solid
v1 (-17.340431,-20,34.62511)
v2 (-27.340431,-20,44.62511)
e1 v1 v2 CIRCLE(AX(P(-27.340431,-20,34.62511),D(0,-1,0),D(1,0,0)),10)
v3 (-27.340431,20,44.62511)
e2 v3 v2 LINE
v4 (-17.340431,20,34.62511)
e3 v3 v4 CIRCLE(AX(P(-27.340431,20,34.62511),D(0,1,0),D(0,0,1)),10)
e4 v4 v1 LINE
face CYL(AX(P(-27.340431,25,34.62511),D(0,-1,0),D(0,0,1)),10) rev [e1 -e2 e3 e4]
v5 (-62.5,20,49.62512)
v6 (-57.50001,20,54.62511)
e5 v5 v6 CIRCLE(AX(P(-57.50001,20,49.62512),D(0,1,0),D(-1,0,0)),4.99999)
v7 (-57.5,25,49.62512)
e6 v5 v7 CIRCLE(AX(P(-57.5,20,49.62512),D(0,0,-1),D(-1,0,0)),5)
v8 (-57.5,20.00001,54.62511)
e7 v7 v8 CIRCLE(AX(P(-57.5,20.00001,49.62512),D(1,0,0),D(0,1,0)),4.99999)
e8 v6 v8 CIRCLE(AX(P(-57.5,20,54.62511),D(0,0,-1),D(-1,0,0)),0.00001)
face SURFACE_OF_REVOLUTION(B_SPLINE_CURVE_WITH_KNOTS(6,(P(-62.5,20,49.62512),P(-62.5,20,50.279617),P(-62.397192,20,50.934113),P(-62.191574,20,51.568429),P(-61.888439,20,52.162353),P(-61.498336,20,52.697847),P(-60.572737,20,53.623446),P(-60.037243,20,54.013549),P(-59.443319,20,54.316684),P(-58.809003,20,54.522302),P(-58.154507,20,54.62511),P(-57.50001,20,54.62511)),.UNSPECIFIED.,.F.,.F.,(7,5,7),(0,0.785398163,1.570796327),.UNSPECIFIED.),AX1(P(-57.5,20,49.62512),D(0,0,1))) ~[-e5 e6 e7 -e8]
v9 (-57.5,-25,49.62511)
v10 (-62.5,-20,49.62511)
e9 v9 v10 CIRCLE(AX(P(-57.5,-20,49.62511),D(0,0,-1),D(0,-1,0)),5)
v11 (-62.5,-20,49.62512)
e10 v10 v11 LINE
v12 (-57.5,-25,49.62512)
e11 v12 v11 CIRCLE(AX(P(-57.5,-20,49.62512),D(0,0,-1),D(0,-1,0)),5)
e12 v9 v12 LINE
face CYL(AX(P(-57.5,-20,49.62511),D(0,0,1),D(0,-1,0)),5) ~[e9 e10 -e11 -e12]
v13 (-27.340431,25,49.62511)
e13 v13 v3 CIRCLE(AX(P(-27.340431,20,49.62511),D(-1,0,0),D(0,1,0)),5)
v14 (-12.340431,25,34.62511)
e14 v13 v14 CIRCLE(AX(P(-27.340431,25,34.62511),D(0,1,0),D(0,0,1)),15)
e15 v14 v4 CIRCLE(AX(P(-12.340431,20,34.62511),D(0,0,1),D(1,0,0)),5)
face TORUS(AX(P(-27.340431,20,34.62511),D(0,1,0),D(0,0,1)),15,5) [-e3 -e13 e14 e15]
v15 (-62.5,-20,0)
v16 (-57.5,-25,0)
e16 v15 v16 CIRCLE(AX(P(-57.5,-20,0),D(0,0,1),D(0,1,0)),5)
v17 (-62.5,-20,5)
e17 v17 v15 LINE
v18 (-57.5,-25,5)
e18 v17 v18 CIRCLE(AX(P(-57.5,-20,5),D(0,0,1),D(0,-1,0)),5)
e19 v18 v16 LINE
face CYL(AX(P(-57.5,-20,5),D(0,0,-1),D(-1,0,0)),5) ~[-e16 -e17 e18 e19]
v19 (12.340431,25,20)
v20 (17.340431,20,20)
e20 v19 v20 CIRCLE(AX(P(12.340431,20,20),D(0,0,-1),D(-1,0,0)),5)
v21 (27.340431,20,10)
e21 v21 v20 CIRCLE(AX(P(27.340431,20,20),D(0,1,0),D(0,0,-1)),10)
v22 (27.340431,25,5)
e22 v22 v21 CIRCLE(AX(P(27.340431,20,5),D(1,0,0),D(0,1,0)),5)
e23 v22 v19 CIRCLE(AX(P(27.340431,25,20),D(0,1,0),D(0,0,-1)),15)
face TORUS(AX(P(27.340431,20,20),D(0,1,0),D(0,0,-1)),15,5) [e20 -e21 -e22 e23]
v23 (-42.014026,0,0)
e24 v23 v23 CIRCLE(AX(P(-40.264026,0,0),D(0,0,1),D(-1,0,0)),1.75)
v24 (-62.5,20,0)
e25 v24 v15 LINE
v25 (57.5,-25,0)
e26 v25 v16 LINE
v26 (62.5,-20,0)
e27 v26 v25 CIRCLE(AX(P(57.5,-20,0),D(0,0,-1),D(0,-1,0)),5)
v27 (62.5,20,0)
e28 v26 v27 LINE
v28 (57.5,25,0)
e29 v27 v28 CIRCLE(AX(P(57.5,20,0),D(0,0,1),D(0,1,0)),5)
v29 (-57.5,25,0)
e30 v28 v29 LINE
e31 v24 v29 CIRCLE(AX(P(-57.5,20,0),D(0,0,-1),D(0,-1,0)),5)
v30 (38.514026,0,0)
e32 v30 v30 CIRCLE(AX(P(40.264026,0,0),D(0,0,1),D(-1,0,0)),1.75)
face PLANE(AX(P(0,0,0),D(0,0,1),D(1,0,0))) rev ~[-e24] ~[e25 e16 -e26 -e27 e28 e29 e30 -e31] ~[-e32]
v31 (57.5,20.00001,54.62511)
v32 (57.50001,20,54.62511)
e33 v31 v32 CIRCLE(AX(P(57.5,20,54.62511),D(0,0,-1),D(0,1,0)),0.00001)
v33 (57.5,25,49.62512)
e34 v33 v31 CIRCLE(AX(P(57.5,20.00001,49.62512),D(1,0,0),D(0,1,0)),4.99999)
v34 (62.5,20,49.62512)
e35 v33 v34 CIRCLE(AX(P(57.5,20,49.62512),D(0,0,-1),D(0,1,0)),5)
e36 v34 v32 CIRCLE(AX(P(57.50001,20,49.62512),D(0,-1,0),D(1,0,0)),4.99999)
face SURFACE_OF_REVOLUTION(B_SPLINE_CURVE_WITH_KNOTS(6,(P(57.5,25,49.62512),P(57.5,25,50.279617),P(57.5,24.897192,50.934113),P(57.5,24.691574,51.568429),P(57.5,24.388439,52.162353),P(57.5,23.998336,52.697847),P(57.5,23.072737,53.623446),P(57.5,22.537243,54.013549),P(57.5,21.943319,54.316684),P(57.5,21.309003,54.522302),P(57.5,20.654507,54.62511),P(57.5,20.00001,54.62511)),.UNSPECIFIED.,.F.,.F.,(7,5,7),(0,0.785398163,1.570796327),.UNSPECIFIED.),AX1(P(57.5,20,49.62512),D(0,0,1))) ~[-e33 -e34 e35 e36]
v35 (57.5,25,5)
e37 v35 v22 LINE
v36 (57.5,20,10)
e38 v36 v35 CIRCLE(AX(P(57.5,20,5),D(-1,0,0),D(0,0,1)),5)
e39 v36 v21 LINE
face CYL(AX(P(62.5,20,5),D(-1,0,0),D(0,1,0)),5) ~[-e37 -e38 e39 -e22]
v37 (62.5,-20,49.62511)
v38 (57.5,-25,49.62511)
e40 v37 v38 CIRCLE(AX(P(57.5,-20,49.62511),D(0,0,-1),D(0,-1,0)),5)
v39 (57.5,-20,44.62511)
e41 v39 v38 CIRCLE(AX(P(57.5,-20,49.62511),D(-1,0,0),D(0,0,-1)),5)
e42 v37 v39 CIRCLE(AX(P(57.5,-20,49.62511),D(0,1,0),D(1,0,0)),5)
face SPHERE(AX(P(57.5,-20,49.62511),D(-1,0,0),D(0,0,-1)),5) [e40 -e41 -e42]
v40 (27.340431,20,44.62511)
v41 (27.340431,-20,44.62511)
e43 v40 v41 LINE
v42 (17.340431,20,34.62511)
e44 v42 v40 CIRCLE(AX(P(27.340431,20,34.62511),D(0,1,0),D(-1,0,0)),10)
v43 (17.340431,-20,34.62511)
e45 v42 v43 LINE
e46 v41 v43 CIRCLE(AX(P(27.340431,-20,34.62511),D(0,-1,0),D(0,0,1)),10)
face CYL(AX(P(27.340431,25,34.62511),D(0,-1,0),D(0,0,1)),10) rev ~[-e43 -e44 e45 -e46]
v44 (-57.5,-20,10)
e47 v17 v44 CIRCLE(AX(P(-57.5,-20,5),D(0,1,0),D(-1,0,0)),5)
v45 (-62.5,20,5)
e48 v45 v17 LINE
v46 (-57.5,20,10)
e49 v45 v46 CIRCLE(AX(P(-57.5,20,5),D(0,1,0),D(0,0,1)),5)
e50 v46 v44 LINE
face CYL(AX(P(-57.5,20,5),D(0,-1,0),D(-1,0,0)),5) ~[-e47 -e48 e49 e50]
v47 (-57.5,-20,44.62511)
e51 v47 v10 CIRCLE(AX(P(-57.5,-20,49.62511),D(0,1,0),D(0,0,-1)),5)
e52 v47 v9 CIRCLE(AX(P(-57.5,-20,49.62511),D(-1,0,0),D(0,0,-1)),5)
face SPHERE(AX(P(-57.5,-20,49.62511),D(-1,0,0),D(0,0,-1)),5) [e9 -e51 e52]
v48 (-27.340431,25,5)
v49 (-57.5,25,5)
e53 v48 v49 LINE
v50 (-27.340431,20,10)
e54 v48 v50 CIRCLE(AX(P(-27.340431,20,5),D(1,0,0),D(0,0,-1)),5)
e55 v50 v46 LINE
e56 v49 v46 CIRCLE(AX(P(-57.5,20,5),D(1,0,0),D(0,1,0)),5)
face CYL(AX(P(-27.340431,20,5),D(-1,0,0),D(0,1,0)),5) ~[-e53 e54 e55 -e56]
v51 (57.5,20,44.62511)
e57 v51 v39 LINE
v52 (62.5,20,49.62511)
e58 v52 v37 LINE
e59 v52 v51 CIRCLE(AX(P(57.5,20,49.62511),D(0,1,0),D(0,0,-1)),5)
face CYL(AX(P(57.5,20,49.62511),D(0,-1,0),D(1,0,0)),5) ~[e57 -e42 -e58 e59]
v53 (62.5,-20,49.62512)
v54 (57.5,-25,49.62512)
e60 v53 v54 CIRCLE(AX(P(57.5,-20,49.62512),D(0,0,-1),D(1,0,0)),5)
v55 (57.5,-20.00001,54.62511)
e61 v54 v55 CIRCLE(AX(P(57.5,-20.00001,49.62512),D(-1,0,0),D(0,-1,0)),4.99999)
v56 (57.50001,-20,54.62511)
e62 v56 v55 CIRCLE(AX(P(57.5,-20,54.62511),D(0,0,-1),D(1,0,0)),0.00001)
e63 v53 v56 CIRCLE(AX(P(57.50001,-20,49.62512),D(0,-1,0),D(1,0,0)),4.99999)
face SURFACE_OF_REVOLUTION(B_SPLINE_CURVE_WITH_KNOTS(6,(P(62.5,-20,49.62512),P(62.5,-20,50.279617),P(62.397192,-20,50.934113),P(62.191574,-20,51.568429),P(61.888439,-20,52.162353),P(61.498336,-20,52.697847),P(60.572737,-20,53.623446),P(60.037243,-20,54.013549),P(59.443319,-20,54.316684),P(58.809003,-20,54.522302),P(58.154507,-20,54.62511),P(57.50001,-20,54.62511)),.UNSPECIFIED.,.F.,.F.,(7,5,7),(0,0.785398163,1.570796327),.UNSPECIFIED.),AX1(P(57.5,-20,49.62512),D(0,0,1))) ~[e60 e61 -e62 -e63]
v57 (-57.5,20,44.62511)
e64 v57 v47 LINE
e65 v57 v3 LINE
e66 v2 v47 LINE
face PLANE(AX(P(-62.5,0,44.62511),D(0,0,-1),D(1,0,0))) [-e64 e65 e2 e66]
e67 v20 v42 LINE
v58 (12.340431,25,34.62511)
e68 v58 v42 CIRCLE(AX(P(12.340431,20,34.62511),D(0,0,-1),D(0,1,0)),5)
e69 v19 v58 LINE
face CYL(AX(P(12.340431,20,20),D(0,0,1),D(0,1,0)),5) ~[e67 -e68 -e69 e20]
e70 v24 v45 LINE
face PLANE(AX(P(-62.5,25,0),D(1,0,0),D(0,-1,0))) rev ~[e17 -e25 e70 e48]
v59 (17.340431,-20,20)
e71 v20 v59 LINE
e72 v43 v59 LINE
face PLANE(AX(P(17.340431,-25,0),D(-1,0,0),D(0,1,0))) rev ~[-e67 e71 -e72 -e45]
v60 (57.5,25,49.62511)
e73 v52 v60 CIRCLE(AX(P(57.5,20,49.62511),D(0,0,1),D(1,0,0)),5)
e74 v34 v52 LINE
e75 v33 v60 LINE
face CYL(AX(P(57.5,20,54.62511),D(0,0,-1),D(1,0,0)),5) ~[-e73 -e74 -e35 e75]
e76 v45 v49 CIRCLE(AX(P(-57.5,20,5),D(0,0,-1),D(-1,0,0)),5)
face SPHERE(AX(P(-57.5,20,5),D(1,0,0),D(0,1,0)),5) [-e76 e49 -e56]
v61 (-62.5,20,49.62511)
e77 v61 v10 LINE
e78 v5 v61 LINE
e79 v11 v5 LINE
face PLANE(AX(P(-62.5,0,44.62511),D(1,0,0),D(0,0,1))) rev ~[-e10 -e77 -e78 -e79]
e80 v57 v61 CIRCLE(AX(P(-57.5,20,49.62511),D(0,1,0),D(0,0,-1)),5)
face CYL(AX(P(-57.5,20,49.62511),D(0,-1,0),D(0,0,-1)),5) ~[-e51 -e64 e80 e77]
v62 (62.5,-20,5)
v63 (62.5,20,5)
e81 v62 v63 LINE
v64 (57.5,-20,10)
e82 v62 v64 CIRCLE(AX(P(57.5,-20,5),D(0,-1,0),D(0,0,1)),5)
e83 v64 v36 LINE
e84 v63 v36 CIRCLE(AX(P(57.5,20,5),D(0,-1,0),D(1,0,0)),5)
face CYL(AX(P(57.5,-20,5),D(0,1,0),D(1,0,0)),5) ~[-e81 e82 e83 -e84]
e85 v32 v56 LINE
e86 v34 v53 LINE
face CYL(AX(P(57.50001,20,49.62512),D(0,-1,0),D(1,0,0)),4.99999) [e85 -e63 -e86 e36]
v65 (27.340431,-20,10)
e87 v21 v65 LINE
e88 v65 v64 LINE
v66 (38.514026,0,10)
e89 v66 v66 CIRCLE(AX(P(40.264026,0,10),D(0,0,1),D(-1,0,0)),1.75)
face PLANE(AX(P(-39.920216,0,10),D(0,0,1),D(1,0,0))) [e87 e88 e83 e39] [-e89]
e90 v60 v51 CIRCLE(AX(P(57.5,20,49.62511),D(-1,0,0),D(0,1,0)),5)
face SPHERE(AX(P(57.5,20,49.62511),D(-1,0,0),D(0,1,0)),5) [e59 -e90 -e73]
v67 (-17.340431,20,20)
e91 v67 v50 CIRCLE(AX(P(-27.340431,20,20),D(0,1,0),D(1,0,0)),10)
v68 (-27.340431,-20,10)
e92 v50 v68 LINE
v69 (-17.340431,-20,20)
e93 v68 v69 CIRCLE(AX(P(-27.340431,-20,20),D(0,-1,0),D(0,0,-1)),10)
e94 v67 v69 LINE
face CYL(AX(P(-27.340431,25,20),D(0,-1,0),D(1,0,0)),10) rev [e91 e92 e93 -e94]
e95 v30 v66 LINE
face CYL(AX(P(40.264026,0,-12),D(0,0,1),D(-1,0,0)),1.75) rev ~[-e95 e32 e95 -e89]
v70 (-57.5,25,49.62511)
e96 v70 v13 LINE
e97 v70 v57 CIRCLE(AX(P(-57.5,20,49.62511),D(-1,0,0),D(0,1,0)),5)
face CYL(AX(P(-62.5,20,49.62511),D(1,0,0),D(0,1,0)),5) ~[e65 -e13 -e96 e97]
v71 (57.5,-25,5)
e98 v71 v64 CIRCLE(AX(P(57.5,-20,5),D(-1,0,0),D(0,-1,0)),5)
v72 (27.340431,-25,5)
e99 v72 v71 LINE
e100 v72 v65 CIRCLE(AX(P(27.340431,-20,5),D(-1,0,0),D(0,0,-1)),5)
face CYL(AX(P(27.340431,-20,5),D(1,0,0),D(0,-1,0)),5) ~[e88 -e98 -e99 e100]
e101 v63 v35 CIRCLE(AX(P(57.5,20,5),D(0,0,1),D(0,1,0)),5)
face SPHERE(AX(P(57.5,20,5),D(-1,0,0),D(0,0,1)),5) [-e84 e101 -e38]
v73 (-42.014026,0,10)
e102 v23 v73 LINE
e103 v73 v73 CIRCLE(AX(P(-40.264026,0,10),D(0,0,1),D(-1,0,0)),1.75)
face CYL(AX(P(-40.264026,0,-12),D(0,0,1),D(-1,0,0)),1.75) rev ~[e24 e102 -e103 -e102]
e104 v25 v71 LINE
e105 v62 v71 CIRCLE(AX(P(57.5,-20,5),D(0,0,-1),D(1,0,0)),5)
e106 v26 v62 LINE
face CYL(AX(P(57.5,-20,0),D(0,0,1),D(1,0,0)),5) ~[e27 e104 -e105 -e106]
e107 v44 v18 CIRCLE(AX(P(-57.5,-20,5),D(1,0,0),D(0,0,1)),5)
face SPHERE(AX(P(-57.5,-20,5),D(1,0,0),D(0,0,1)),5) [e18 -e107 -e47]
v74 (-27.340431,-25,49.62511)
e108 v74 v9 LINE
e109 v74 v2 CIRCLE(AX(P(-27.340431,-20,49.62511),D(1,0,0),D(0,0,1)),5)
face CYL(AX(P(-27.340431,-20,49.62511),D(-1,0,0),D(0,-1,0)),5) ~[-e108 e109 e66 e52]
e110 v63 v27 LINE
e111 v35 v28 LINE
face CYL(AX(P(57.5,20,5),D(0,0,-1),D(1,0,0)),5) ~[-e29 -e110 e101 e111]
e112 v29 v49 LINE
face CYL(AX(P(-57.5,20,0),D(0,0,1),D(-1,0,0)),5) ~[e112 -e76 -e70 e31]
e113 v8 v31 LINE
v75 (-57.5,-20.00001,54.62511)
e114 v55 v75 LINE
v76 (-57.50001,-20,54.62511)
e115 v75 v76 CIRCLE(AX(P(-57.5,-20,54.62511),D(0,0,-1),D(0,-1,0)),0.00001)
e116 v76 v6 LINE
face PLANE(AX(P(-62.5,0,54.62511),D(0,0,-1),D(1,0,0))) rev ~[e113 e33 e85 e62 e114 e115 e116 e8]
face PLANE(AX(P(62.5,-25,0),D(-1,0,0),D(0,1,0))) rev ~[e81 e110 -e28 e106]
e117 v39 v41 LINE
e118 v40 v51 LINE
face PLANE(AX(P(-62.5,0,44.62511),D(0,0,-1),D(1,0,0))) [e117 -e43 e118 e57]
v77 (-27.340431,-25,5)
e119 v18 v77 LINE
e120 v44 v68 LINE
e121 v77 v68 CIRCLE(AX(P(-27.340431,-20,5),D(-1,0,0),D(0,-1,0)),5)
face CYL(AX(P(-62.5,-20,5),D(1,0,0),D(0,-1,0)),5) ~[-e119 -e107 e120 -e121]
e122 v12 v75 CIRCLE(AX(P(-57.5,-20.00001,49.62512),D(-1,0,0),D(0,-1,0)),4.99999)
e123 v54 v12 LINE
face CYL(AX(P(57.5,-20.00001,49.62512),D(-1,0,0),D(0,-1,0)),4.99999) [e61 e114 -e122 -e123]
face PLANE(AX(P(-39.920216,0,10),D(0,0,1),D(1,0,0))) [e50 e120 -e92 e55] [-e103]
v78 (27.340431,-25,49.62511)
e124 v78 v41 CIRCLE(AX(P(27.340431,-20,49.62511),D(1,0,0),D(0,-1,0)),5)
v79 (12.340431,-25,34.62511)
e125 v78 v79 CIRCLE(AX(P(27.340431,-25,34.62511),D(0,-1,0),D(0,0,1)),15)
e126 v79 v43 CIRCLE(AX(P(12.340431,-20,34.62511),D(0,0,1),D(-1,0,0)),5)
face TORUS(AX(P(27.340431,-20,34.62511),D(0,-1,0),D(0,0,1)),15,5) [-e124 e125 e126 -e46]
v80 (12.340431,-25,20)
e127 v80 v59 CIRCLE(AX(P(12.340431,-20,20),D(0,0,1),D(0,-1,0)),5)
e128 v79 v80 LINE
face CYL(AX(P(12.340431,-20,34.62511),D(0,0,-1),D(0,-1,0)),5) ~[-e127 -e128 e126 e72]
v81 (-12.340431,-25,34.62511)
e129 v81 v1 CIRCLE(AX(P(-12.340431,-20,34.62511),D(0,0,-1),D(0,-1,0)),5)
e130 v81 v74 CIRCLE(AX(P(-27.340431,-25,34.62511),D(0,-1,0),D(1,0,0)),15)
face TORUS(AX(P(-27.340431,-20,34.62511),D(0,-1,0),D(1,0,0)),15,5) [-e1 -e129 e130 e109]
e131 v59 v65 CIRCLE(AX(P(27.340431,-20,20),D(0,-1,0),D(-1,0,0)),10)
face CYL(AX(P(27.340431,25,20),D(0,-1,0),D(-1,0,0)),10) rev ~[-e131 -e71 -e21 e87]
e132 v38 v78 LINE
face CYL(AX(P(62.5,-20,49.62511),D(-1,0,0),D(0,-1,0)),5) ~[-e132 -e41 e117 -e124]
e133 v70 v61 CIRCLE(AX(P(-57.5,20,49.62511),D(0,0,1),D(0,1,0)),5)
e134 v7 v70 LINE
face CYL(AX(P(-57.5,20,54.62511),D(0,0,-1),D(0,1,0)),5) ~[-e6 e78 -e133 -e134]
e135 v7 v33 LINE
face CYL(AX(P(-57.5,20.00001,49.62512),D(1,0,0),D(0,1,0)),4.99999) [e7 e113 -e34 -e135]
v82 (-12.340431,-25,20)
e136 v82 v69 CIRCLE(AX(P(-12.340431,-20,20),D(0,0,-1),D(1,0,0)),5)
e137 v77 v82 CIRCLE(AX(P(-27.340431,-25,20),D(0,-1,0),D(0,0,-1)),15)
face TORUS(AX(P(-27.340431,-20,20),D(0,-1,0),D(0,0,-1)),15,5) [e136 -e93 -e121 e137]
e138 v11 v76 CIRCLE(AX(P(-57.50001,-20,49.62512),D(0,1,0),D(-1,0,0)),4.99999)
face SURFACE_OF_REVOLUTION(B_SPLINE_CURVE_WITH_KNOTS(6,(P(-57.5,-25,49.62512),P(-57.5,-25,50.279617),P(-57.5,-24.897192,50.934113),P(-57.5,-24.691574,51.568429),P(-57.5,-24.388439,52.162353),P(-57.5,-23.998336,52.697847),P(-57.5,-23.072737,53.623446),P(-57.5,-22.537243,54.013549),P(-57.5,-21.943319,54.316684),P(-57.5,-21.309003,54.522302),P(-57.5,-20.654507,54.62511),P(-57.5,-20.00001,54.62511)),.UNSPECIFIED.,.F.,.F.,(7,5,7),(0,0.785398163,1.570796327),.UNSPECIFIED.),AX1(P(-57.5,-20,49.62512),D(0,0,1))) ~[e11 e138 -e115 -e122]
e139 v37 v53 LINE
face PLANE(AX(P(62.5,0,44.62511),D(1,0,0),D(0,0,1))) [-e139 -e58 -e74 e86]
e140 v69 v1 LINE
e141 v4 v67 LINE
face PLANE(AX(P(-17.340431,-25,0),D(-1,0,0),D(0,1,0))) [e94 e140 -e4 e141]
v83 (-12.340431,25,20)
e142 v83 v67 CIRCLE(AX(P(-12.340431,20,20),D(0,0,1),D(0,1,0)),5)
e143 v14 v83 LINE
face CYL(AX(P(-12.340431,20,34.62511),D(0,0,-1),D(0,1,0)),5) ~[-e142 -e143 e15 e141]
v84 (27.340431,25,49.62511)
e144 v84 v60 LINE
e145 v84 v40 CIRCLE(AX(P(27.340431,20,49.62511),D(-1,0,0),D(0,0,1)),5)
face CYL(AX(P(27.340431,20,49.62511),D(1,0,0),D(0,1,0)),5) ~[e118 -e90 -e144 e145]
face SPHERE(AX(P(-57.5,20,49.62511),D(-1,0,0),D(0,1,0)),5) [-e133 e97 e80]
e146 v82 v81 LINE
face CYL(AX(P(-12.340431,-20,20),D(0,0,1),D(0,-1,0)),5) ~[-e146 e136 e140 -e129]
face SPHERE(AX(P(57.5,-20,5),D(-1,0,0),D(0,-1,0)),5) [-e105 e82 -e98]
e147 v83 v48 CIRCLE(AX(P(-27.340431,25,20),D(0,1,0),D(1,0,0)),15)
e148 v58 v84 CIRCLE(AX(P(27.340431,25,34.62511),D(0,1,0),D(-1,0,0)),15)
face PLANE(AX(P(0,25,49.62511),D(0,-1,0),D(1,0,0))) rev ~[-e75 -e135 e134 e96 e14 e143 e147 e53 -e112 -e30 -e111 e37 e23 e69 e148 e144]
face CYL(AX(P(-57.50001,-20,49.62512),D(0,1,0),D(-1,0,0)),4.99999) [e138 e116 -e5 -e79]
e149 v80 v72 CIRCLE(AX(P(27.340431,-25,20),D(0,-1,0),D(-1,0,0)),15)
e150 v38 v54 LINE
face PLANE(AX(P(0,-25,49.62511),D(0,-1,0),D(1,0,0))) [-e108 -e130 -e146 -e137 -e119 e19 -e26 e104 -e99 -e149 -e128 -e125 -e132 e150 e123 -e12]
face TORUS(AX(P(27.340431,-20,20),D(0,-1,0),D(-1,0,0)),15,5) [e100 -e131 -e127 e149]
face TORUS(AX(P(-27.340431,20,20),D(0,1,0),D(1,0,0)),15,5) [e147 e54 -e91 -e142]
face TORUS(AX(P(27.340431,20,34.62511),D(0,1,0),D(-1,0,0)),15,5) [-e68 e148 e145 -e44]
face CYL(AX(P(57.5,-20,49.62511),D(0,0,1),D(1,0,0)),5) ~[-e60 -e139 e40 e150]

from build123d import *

# Parameters (mm, degrees)
F0_W     = 34.6808620631
F0_H     = 50
F1_DEPTH = 10
F2_DEPTH = 50
F3_W     = 125
F3_H     = 10
F4_DEPTH = 25
F5_R     = 10
F6_R     = 5
F7_R     = 5
F8_D     = 3.5
F8_DEPTH = 12
F8_TIP   = 1.0515060833
F9_R     = 4.99999


# Not quite as in the source:
# - a fillet or chamfer is up to 0.001 mm smaller than in the source, because OpenCascade refuses the exact size


with BuildPart() as f1:
    # F0 (on Top) → F1 (new body)
    with BuildSketch(Plane.XY):
        Polygon((-17.3404310315, -25), (-17.3404310315, 25), (-40.2640256677, 25), (-62.5, 25), (-62.5, -25), (-40.2640256677, -25), align=None)
        Polygon((62.5, -25), (62.5, 25), (40.2640256677, 25), (17.3404310315, 25), (17.3404310315, -25), (40.2640256677, -25), align=None)
        Rectangle(F0_W, F0_H)
    extrude(amount=F1_DEPTH)

    # F0 (on Top) → F2 (join)
    with BuildSketch(Plane.XY):
        Rectangle(F0_W, F0_H)
    extrude(amount=F2_DEPTH)

    # F3 (on Front) → F4 (join, symmetric)
    with BuildSketch(Plane.XZ):
        with Locations((0, 49.6251098812)):
            Rectangle(F3_W, F3_H)
    extrude(amount=F4_DEPTH, both=True)

    # F5
    f5_edges = [f1.edges().sort_by_distance(p)[0] for p in [
        (-17.340431, 0, 10),
        (17.340431, 0, 10),
        (17.340431, 0, 44.62511),
        (-17.340431, 0, 44.62511),
    ]]
    fillet(f5_edges, radius=F5_R)

    # F6
    f6_edges = [f1.edges().sort_by_distance(p)[0] for p in [
        (44.920216, -25, 10),
        (44.920216, 25, 10),
        (-44.920216, -25, 10),
        (-44.920216, 25, 10),
    ]]
    fillet(f6_edges, radius=F6_R)

    # F7
    f7_edges = [f1.edges().sort_by_distance(p)[0] for p in [
        (-62.5, 0, 10),
        (-62.5, 0, 44.62511),
        (62.5, 0, 10),
        (62.5, 0, 44.62511),
    ]]
    fillet(f7_edges, radius=F7_R)

    # F8
    with Locations(Plane(origin=(0, 0, 0), x_dir=(1, 0, 0), z_dir=(0, 0, -1))):
        with Locations((-40.2640256677, 0), (40.2640256677, 0)):
            Hole(F8_D / 2, depth=F8_DEPTH)
            with Locations((0, 0, -(F8_DEPTH + F8_TIP / 2))):  # 118° drill point
                Cone(0, F8_D / 2, F8_TIP, mode=Mode.SUBTRACT)

    # F9 (radius 5 in the source; OpenCascade refuses exactly that, so slightly less here)
    f9_edges = [f1.edges().sort_by_distance(p)[0] for p in [
        (0, 25, 54.62511),
        (62.5, 0, 54.62511),
    ]]
    fillet(f9_edges, radius=F9_R)


solid = f1.part
